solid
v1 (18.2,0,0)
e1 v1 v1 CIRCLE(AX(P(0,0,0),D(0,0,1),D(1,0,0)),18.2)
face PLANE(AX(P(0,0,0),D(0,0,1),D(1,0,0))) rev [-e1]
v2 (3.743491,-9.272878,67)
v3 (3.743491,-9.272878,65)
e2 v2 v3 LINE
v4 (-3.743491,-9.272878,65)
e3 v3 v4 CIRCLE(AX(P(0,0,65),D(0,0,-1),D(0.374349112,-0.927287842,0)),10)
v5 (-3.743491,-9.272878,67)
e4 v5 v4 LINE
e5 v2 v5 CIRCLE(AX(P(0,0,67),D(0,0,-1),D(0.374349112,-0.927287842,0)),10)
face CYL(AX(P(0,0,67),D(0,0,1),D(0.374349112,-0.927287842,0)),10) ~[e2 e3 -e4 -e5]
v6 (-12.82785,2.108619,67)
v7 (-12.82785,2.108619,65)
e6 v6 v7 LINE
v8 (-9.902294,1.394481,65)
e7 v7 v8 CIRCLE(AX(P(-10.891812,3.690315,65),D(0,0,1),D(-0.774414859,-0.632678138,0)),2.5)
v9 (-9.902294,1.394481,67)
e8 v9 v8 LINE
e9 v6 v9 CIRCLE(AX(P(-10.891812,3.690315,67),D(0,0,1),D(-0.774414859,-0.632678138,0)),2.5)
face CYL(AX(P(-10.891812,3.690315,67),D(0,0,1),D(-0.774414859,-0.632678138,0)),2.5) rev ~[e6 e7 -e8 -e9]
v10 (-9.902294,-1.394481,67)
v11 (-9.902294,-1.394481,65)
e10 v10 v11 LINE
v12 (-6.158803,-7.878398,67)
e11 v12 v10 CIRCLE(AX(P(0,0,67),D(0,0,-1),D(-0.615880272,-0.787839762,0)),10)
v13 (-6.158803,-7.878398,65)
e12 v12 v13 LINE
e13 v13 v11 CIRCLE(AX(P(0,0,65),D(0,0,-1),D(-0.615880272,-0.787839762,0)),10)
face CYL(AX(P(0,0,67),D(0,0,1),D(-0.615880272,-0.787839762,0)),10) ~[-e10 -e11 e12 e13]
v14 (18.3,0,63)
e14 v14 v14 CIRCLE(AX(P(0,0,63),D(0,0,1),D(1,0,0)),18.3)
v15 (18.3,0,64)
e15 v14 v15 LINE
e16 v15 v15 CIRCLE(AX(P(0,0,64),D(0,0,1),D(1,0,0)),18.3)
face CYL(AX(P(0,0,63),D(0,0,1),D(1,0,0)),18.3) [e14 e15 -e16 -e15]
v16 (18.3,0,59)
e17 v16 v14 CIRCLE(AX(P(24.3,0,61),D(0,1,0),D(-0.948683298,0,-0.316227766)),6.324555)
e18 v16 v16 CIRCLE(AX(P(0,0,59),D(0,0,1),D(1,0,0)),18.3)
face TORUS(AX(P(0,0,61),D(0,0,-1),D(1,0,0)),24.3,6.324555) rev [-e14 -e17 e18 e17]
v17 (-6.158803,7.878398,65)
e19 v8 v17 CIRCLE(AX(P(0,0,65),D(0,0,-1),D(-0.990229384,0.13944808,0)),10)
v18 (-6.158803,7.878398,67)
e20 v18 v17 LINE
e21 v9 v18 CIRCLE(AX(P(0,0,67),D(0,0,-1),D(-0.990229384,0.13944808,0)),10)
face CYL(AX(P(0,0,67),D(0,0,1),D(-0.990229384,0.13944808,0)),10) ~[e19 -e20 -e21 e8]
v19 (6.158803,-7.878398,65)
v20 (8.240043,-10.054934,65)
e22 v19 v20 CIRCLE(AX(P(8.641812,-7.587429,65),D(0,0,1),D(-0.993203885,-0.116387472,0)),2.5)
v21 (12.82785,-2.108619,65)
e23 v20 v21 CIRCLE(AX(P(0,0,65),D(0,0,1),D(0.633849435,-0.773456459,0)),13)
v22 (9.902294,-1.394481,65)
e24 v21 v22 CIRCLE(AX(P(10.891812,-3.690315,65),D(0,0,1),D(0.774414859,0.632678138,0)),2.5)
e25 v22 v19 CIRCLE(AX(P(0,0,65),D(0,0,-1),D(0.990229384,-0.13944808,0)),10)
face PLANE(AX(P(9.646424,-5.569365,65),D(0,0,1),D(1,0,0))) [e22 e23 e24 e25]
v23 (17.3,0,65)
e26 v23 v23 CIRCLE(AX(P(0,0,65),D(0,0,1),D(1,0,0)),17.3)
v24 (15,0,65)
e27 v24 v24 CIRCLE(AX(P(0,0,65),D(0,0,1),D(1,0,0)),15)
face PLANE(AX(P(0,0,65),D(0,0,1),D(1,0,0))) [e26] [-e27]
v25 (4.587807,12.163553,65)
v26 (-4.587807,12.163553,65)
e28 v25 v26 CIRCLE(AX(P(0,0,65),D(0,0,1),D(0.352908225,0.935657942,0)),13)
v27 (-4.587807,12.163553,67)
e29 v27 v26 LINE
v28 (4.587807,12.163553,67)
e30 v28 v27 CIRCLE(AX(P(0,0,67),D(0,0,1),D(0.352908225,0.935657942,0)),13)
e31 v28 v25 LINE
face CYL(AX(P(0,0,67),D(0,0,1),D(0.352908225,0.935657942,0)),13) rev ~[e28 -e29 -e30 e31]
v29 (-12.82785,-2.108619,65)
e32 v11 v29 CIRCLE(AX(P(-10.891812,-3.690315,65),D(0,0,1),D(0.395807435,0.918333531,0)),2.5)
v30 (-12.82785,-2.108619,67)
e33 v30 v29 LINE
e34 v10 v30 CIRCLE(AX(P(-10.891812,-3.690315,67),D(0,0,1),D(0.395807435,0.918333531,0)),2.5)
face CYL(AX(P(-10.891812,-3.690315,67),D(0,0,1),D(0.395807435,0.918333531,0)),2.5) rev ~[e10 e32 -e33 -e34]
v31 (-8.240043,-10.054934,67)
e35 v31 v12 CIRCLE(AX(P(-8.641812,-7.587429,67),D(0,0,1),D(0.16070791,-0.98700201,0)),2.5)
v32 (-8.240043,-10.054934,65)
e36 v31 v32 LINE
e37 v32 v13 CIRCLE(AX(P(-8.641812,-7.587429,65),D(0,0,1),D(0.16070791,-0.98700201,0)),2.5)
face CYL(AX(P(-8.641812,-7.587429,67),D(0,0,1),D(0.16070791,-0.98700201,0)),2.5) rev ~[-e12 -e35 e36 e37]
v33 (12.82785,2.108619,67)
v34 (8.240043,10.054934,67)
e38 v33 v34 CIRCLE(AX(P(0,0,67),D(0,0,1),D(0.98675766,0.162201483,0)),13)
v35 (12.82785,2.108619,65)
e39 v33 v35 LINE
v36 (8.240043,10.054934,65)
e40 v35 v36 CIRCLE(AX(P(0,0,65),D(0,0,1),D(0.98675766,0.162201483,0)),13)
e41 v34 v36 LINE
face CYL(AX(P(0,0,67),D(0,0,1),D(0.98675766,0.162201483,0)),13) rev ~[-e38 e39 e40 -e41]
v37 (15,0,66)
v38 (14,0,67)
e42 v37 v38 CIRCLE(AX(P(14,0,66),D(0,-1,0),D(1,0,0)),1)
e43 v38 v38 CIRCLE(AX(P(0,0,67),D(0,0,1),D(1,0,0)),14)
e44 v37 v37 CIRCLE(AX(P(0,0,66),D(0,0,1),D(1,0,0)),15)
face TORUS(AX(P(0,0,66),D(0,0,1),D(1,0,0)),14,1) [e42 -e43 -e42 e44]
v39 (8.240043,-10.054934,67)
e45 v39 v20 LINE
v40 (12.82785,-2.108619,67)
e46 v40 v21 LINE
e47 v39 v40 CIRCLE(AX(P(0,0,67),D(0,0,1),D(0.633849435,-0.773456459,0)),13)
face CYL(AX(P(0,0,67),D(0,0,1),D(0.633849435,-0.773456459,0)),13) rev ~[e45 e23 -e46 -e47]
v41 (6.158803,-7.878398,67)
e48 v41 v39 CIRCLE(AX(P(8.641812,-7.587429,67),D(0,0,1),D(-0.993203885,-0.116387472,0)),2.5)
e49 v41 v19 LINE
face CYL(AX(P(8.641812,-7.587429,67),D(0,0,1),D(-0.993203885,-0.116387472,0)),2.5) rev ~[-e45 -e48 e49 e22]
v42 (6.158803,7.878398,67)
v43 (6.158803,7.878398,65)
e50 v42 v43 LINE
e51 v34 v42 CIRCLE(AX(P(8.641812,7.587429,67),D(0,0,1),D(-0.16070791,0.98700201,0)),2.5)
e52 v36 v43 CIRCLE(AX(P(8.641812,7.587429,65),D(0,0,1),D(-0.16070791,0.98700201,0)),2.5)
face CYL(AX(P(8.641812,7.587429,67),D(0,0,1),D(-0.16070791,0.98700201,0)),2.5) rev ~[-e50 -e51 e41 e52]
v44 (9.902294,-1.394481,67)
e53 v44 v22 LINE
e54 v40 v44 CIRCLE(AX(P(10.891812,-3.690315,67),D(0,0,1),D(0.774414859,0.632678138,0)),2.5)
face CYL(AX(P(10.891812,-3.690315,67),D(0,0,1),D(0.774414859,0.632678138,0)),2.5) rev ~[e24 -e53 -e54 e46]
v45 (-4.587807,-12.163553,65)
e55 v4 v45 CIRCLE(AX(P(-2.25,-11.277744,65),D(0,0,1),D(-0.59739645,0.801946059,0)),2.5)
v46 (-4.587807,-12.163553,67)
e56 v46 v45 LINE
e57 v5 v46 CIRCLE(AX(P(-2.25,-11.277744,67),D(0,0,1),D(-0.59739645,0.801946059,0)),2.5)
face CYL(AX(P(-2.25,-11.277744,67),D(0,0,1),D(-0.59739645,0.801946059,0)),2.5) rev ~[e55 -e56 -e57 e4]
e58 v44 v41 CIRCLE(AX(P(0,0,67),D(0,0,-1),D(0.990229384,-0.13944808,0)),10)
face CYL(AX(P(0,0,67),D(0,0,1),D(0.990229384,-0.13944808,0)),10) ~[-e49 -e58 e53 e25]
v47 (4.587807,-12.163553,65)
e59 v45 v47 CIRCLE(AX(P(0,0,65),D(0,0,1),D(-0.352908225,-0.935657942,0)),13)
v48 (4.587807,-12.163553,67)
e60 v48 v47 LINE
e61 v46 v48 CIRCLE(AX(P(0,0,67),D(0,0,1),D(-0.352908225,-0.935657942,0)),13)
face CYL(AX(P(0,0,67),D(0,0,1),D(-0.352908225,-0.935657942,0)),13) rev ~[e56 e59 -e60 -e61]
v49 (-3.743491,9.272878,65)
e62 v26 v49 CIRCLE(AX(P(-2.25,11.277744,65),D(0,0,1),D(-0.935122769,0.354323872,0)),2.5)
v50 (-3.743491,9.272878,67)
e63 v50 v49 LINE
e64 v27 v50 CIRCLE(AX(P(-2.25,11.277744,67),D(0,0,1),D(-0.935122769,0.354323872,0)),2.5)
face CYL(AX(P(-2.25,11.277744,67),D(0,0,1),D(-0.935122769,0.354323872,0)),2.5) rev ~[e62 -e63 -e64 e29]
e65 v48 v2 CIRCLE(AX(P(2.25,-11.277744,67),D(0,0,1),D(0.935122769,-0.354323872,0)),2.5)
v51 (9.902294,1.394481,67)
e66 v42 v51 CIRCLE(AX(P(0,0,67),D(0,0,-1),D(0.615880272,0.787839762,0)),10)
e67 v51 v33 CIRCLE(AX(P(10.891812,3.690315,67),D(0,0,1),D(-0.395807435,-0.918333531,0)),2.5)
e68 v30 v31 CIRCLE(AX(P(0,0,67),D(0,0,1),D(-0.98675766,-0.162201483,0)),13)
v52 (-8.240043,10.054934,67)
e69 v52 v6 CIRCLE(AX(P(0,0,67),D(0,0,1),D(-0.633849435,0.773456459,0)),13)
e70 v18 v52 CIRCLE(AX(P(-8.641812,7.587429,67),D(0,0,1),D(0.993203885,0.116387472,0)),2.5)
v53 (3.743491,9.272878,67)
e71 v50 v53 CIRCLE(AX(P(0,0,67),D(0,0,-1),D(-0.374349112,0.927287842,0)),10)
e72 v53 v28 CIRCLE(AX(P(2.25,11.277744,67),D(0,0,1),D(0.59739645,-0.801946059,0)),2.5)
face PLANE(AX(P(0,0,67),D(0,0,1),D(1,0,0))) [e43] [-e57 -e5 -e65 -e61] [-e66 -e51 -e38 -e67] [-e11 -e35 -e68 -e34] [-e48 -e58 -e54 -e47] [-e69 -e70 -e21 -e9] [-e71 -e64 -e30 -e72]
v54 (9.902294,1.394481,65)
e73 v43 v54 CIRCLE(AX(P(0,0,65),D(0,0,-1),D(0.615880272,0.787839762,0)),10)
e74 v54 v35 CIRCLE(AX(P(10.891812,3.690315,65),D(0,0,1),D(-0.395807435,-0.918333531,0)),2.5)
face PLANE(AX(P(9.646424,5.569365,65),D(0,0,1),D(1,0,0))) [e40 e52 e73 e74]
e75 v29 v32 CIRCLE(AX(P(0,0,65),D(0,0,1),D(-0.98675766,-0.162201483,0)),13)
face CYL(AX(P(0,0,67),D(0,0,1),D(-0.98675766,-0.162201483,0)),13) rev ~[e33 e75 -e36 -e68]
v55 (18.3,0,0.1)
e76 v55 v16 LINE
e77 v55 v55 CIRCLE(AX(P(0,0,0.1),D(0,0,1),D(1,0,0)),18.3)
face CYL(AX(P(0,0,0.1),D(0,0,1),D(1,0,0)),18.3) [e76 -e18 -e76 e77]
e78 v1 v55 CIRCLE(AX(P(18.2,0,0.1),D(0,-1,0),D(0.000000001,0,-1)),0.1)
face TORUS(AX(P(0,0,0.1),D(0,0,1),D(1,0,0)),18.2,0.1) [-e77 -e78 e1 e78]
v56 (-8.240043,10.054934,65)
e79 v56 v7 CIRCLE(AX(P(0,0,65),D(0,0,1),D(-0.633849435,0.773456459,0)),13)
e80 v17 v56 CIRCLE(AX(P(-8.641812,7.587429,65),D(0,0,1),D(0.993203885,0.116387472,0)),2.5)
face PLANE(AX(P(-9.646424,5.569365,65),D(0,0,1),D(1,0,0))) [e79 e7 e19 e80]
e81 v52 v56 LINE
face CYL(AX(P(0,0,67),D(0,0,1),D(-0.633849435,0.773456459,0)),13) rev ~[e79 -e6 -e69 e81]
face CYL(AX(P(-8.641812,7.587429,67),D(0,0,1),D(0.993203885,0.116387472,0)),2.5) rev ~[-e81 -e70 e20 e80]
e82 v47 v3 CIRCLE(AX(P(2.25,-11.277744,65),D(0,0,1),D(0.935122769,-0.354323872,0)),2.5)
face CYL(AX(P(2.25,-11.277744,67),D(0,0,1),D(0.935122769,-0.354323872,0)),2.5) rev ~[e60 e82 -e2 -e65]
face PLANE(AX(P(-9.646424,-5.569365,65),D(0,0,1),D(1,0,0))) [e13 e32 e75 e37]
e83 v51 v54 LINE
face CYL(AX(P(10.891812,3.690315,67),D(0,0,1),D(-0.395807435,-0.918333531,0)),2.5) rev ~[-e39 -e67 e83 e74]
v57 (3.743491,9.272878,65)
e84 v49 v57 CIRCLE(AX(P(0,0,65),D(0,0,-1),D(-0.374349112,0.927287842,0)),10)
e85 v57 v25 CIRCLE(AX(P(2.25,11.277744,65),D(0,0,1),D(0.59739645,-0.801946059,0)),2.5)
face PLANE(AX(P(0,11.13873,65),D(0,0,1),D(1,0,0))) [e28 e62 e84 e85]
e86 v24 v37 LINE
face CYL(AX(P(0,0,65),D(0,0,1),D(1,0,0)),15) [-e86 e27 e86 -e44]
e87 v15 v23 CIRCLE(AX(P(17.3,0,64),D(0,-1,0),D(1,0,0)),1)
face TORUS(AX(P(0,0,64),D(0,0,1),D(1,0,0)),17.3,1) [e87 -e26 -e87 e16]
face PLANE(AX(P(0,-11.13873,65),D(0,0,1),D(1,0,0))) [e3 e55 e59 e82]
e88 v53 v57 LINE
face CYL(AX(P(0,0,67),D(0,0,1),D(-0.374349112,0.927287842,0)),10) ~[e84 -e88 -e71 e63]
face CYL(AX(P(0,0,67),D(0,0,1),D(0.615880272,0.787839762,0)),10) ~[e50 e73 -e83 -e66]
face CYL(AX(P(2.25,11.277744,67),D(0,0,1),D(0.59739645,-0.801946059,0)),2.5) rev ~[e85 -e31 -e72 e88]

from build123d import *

# Parameters (mm, degrees)
F4_DEPTH = 2


# Not quite as in the source:
# - a feature of the source that left no trace in its solid (it failed there, or was rolled back) is left out


with BuildPart() as f2:
    # F1 (on Front) → F2 (revolve)
    with BuildSketch(Plane.XZ):
        with BuildLine():
            Line((0, 67), (0, 65))
            Line((0, 65), (15, 65))
            Line((15, 65), (15, 66))
            ThreePointArc((15, 66), (14.7071067812, 66.7071067812), (14, 67))
            Line((14, 67), (0, 67))
        make_face()
        with BuildLine():
            Line((0, 65), (0, 0))
            Line((0, 0), (18.2, 0))
            ThreePointArc((18.2, 0), (18.2707106781, 0.0292893219), (18.3, 0.1))
            Line((18.3, 0.1), (18.3, 59))
            ThreePointArc((18.3, 59), (17.9754446797, 61), (18.3, 63))
            Line((18.3, 63), (18.3, 64))
            ThreePointArc((18.3, 64), (18.0071067812, 64.7071067812), (17.3, 65))
            Line((17.3, 65), (15, 65))
            Line((15, 65), (0, 65))
        make_face()
    revolve(axis=Axis((0, 0, 33.5), (0, 0, 1)))

    # F3 (on face) → F4 (cut)
    with BuildSketch(Plane.XY.offset(67)):
        with BuildLine():
            ThreePointArc((-6.1588027163, 7.8783976227), (-6.8349323024, 9.3151975073), (-8.240042652, 10.0549339676))
            ThreePointArc((-8.240042652, 10.0549339676), (-11.2583302492, 6.5), (-12.8278495753, 2.1086192811))
            ThreePointArc((-12.8278495753, 2.1086192811), (-11.4846638338, 1.2616262534), (-9.9022938405, 1.3944807979))
            ThreePointArc((-9.9022938405, 1.3944807979), (-8.6602540378, 5), (-6.1588027163, 7.8783976227))
        make_face()
        with BuildLine():
            ThreePointArc((-3.7434911242, 9.2728784206), (0, 10), (3.7434911242, 9.2728784206))
            ThreePointArc((3.7434911242, 9.2728784206), (4.6497315314, 10.5768237606), (4.5878069233, 12.1635532487))
            ThreePointArc((4.5878069233, 12.1635532487), (0, 13), (-4.5878069233, 12.1635532487))
            ThreePointArc((-4.5878069233, 12.1635532487), (-4.6497315314, 10.5768237606), (-3.7434911242, 9.2728784206))
        make_face()
        with BuildLine():
            ThreePointArc((-9.9022938405, -1.3944807979), (-11.4846638338, -1.2616262534), (-12.8278495753, -2.1086192811))
            ThreePointArc((-12.8278495753, -2.1086192811), (-11.2583302492, -6.5), (-8.240042652, -10.0549339676))
            ThreePointArc((-8.240042652, -10.0549339676), (-6.8349323024, -9.3151975073), (-6.1588027163, -7.8783976227))
            ThreePointArc((-6.1588027163, -7.8783976227), (-8.6602540378, -5), (-9.9022938405, -1.3944807979))
        make_face()
        with BuildLine():
            ThreePointArc((-3.7434911242, -9.2728784206), (-4.6497315314, -10.5768237606), (-4.5878069233, -12.1635532487))
            ThreePointArc((-4.5878069233, -12.1635532487), (0, -13), (4.5878069233, -12.1635532487))
            ThreePointArc((4.5878069233, -12.1635532487), (4.6497315314, -10.5768237606), (3.7434911242, -9.2728784206))
            ThreePointArc((3.7434911242, -9.2728784206), (0, -10), (-3.7434911242, -9.2728784206))
        make_face()
        with BuildLine():
            ThreePointArc((6.1588027163, -7.8783976227), (6.8349323024, -9.3151975073), (8.240042652, -10.0549339676))
            ThreePointArc((8.240042652, -10.0549339676), (11.2583302492, -6.5), (12.8278495753, -2.1086192811))
            ThreePointArc((12.8278495753, -2.1086192811), (11.4846638338, -1.2616262534), (9.9022938405, -1.3944807979))
            ThreePointArc((9.9022938405, -1.3944807979), (8.6602540378, -5), (6.1588027163, -7.8783976227))
        make_face()
        with BuildLine():
            ThreePointArc((9.9022938405, 1.3944807979), (11.4846638338, 1.2616262534), (12.8278495753, 2.1086192811))
            ThreePointArc((12.8278495753, 2.1086192811), (11.2583302492, 6.5), (8.240042652, 10.0549339676))
            ThreePointArc((8.240042652, 10.0549339676), (6.8349323024, 9.3151975073), (6.1588027163, 7.8783976227))
            ThreePointArc((6.1588027163, 7.8783976227), (8.6602540378, 5), (9.9022938405, 1.3944807979))
        make_face()
    extrude(amount=-F4_DEPTH, mode=Mode.SUBTRACT)


solid = f2.part
